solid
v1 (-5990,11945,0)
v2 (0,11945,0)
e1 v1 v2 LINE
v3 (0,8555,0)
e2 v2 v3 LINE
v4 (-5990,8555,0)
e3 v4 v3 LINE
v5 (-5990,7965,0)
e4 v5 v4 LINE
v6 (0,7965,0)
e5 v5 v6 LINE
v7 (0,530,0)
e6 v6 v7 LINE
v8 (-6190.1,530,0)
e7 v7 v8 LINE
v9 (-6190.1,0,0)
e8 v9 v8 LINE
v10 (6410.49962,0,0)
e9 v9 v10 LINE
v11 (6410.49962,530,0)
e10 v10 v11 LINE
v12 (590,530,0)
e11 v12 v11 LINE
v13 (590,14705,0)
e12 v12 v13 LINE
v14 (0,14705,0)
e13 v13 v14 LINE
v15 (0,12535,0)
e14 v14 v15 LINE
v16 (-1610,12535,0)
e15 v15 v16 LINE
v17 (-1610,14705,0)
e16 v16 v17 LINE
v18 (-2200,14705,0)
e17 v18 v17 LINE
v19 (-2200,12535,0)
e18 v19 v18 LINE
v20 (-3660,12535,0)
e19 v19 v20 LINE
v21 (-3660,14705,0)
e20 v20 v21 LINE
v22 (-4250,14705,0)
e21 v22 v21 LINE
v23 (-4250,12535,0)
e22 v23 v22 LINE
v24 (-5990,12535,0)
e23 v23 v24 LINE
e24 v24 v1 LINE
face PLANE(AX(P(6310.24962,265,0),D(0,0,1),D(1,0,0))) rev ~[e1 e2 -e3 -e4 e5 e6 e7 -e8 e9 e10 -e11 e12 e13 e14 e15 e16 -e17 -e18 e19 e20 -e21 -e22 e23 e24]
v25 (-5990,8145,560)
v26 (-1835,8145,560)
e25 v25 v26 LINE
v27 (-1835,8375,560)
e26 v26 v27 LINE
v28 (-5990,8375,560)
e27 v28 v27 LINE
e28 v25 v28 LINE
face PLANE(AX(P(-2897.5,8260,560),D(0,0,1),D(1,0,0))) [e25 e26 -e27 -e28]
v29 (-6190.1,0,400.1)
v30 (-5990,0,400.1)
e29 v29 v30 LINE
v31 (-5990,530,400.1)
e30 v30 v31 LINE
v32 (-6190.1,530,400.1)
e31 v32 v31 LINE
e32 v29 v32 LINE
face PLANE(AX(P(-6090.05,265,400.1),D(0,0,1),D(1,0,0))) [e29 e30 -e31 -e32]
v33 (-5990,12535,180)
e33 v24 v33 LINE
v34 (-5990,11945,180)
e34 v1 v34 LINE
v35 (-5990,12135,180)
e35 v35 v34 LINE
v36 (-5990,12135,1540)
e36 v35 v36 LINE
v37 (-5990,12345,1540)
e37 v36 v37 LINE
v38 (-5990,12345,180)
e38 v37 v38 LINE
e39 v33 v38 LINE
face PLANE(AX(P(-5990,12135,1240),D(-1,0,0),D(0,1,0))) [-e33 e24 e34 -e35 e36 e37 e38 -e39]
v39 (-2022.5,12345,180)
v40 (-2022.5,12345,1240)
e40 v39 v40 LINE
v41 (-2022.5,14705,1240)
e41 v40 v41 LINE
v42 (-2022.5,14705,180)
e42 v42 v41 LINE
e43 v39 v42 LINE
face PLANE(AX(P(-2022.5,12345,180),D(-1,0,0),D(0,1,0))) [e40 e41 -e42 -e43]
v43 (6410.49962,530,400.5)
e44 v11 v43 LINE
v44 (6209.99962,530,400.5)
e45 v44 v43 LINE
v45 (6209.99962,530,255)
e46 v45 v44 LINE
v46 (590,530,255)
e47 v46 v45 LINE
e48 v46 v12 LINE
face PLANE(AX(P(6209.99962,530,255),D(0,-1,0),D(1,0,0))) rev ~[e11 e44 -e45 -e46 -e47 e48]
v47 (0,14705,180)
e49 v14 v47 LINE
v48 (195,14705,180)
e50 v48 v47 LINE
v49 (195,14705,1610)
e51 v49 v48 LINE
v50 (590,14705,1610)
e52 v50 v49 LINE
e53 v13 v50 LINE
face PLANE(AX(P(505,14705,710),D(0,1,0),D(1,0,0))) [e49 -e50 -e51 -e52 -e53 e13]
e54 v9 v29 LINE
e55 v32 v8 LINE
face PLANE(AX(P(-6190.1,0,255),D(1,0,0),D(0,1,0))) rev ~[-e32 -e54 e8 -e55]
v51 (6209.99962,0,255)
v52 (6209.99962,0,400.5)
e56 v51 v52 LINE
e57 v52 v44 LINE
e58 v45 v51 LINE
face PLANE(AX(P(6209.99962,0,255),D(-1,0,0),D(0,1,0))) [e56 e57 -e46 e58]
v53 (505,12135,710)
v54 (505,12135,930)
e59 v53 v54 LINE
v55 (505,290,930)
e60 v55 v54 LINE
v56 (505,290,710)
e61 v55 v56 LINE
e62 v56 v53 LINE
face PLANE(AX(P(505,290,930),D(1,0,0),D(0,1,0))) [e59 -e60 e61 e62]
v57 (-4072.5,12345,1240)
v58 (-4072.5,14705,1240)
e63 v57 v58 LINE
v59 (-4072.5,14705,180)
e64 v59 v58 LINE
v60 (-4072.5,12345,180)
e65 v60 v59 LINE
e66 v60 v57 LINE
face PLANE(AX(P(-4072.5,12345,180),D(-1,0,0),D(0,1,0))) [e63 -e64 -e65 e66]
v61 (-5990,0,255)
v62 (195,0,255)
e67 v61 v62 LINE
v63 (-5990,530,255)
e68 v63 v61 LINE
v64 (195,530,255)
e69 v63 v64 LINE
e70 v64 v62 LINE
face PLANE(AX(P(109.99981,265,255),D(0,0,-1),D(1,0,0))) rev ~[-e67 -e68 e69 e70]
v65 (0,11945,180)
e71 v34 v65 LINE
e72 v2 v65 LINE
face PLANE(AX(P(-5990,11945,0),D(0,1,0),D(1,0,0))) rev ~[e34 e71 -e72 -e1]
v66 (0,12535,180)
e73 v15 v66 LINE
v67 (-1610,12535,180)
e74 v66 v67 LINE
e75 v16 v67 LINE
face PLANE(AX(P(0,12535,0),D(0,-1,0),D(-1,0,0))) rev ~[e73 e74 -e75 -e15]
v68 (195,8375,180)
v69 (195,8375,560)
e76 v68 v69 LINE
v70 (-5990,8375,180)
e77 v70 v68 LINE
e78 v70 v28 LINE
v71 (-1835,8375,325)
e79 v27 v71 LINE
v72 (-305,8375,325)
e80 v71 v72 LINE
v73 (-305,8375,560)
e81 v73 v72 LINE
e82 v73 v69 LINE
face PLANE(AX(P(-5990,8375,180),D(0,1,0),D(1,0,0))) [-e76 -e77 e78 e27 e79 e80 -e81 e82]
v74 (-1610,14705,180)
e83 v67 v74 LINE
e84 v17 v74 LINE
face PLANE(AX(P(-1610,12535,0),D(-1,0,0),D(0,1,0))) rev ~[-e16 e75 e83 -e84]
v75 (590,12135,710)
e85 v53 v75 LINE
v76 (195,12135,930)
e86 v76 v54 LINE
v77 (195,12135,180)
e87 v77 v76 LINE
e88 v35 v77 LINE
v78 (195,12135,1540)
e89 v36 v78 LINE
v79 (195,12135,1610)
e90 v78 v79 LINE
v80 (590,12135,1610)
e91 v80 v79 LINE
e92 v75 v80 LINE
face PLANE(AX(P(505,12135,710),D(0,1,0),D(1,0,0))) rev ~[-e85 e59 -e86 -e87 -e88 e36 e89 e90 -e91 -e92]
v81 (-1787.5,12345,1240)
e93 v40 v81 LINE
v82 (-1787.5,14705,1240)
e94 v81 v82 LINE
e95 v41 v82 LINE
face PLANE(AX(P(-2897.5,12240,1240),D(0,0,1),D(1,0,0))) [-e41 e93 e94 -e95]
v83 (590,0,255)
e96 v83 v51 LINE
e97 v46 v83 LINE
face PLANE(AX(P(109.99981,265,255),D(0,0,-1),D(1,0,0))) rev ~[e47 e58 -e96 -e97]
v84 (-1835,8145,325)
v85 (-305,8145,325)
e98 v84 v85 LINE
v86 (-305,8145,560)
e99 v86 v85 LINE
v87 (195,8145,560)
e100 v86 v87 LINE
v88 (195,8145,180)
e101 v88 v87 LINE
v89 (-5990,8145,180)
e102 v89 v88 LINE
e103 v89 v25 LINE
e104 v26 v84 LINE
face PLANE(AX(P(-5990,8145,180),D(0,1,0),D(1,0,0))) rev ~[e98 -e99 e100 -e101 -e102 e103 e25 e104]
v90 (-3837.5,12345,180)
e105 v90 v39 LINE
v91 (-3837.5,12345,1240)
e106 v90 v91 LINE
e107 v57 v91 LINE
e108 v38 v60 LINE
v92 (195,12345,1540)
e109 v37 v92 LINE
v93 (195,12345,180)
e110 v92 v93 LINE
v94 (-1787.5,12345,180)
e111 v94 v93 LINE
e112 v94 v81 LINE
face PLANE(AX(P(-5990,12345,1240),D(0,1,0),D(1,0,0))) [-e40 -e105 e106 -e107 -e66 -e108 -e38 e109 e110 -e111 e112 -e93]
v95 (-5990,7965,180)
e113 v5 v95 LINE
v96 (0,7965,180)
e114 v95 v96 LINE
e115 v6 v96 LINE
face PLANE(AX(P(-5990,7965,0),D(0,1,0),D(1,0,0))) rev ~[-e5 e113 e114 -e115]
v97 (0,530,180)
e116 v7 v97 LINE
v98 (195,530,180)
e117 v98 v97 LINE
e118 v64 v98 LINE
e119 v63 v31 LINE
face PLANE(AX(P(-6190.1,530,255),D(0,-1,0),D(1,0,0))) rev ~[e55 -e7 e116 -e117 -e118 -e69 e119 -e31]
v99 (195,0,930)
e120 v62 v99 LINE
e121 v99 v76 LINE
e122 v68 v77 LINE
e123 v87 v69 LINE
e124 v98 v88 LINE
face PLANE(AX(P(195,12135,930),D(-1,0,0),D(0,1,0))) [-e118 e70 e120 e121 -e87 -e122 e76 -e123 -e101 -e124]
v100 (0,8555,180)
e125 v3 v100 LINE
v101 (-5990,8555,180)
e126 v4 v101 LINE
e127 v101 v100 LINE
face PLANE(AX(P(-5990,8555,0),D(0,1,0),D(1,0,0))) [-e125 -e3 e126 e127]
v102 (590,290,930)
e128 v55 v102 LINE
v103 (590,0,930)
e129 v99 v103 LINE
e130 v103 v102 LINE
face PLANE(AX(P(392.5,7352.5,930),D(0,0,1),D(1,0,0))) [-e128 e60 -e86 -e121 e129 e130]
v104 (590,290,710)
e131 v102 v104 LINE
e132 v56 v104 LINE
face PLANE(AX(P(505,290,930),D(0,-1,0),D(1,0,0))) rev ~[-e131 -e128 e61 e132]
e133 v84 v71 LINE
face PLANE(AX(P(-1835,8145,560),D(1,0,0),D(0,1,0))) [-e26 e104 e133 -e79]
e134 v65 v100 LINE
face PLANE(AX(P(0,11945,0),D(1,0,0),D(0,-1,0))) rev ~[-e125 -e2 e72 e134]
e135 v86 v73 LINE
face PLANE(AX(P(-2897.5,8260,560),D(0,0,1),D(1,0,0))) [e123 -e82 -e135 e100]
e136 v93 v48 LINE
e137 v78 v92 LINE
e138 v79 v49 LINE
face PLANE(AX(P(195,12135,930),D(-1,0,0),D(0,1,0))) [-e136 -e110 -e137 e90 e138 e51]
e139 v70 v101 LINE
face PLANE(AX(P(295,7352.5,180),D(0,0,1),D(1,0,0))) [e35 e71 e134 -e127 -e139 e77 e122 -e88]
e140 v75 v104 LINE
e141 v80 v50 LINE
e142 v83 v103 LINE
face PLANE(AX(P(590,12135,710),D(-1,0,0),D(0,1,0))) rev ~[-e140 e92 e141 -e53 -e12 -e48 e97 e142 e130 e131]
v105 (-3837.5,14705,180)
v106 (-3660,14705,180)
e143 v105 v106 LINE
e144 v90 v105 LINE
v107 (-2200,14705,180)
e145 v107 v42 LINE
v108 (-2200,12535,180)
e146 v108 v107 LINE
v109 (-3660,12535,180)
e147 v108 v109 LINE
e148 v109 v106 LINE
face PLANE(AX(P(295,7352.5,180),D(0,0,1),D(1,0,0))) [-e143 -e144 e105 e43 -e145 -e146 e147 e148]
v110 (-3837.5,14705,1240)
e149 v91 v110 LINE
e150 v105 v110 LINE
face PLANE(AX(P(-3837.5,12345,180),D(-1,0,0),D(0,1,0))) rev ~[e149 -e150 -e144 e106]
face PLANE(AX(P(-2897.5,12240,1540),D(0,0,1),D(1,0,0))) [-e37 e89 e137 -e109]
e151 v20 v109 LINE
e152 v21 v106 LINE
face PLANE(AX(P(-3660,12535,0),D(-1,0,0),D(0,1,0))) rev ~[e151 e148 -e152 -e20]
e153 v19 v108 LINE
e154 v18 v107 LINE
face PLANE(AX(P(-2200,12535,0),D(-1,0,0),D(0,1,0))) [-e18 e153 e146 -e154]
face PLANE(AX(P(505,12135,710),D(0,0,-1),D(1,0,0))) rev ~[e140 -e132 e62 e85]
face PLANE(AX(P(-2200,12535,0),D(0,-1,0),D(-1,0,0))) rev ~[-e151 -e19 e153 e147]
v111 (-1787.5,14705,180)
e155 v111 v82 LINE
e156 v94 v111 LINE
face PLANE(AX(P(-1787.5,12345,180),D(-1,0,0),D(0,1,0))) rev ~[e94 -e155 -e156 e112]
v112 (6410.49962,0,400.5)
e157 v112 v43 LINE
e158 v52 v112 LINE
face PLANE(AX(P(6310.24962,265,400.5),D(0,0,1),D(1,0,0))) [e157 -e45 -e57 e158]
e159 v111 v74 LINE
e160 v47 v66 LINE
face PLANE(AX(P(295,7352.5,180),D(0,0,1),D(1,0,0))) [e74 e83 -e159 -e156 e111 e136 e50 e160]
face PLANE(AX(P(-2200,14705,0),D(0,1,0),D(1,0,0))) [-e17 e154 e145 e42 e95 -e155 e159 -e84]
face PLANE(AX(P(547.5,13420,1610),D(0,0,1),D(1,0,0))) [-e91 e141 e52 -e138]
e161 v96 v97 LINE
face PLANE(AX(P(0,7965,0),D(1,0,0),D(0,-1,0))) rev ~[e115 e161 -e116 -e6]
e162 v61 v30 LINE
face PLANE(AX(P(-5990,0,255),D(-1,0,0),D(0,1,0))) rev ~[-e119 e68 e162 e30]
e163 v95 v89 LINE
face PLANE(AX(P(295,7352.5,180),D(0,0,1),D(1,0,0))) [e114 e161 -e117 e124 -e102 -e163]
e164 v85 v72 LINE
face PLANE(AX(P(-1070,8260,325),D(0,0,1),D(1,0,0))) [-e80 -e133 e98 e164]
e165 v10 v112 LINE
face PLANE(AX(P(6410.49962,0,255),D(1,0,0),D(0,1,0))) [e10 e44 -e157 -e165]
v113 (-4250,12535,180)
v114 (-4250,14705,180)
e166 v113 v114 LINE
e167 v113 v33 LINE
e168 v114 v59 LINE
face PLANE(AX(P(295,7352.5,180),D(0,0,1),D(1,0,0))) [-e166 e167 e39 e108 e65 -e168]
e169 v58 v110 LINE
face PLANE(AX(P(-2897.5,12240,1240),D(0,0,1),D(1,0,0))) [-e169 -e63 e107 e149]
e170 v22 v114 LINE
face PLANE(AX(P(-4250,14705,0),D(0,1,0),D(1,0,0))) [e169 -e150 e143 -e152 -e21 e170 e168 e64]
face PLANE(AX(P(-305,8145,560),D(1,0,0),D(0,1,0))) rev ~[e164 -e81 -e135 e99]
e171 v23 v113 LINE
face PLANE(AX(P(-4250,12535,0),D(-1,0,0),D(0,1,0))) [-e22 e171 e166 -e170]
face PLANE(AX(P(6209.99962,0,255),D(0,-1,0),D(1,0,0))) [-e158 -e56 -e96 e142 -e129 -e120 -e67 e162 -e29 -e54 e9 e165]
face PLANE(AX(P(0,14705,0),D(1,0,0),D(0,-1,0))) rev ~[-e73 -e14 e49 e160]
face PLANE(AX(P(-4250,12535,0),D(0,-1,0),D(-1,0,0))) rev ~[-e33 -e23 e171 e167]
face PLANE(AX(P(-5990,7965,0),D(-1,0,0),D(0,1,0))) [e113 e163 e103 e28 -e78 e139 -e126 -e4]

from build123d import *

# Parameters (mm, degrees)
F0_W           = 5990
F0_H           = 590
F0_W_2         = 590
F0_H_2         = 2170
F1_DEPTH       = 180
F2_W           = 395
F2_H           = 14705
F3_DEPTH       = 750
F4_W           = 395
F4_H           = 2570
F5_DEPTH       = 680
F6_W           = 85
F6_H           = 11845
F7_DEPTH       = 220
F8_W           = 6185
F8_H           = 230
F9_DEPTH       = 380
F10_W          = 1530
F10_H          = 230
F11_DEPTH      = 235
F12_W          = 6185
F12_H          = 210
F13_DEPTH      = 1060
F14_W          = 235
F14_H          = 2360
F15_DEPTH      = 1060
F16_W          = 12199.99962
F16_H          = 530
F17_DEPTH      = 255
F18_W          = 85
F18_H          = 900
F19_DEPTH      = 2570.001
F20_W          = 6185
F20_H          = 210
F21_DEPTH      = 300
F22_W          = 85
F22_H          = 2570
F23_DEPTH      = 900
F24_W          = 200.1
F24_H          = 530
F25_DEPTH      = 145.1
F25_DEPTH_BACK = 255
F26_W          = 200.5
F26_H          = 530
F27_DEPTH      = 145.5
F27_DEPTH_BACK = 255


# Not quite as in the source:
# - a feature names something its author has since deleted; it is built from what else it names


with BuildPart() as f1:
    # F0 (on Top) → F1 (new body)
    with BuildSketch(Plane.XY):
        Polygon((0, 7965), (0, 0), (590, 0), (590, 14705), (0, 14705), (0, 12535), (0, 11945), (0, 8555), align=None)
        with Locations((-2995, 8260)):
            Rectangle(F0_W, F0_H)
        Polygon((-5990, 11945), (0, 11945), (0, 12535), (-1610, 12535), (-2200, 12535), (-3660, 12535), (-4250, 12535), (-5990, 12535), align=None)
        with Locations((-3955, 13620)):
            Rectangle(F0_W_2, F0_H_2)
        with Locations((-1905, 13620)):
            Rectangle(F0_W_2, F0_H_2)
    extrude(amount=F1_DEPTH)

    # F2 (on face) → F3 (join)
    with BuildSketch(Plane.XY.offset(180)):
        with Locations((392.5, 7352.5)):
            Rectangle(F2_W, F2_H)
    extrude(amount=F3_DEPTH)

    # F4 (on face) → F5 (join)
    with BuildSketch(Plane.XY.offset(930)):
        with Locations((392.5, 13420)):
            Rectangle(F4_W, F4_H)
    extrude(amount=F5_DEPTH)

    # F6 (on face) → F7 (cut)
    with BuildSketch(Plane.XY.offset(930)):
        with Locations((547.5, 6212.5)):
            Rectangle(F6_W, F6_H)
    extrude(amount=-F7_DEPTH, mode=Mode.SUBTRACT)

    # F8 (on face) → F9 (join)
    with BuildSketch(Plane.XY.offset(180)):
        with Locations((-2897.5, 8260)):
            Rectangle(F8_W, F8_H)
    extrude(amount=F9_DEPTH)

    # F10 (on face) → F11 (cut)
    with BuildSketch(Plane.XY.offset(560)):
        with Locations((-1070, 8260)):
            Rectangle(F10_W, F10_H)
    extrude(amount=-F11_DEPTH, mode=Mode.SUBTRACT)

    # F12 (on face) → F13 (join)
    with BuildSketch(Plane.XY.offset(180)):
        with Locations((-2897.5, 12240)):
            Rectangle(F12_W, F12_H)
    extrude(amount=F13_DEPTH)

    # F14 (on face) → F15 (join, through all)
    with BuildSketch(Plane.XY.offset(180)):
        with Locations((-3955, 13525)):
            Rectangle(F14_W, F14_H)
        with Locations((-1905, 13525)):
            Rectangle(F14_W, F14_H)
    extrude(amount=F15_DEPTH)

    # F16 (on face) → F17 (join)
    with BuildSketch(Plane(origin=(0, 0, 0), x_dir=(1, 0, 0), z_dir=(0, 0, -1))):
        with Locations((109.99981, -265)):
            Rectangle(F16_W, F16_H)
    extrude(amount=-F17_DEPTH)

    # F18 (on face) → F19 (cut, through all)
    with BuildSketch(Plane.XZ.offset(-12135)):
        with Locations((547.5, 1160)):
            Rectangle(F18_W, F18_H)
    extrude(amount=-F19_DEPTH, mode=Mode.SUBTRACT)

    # F20 (on face) → F21 (join)
    with BuildSketch(Plane.XY.offset(1240)):
        with Locations((-2897.5, 12240)):
            Rectangle(F20_W, F20_H)
    extrude(amount=F21_DEPTH)

    # F22 (on face) → F23 (join, through all)
    with BuildSketch(Plane.XY.offset(710)):
        with Locations((547.5, 13420)):
            Rectangle(F22_W, F22_H)
    extrude(amount=F23_DEPTH)

    # F24 (on face) → F25 (join, two sides)
    with BuildSketch(Plane.XY.offset(255)) as f25_sk:
        with Locations((-6090.05, 265)):
            Rectangle(F24_W, F24_H)
    extrude(amount=F25_DEPTH)
    extrude(f25_sk.sketch, amount=-F25_DEPTH_BACK)

    # F26 (on face) → F27 (join, two sides)
    with BuildSketch(Plane.XY.offset(255)) as f27_sk:
        with Locations((6310.24962, 265)):
            Rectangle(F26_W, F26_H)
    extrude(amount=F27_DEPTH)
    extrude(f27_sk.sketch, amount=-F27_DEPTH_BACK)


solid = f1.part
